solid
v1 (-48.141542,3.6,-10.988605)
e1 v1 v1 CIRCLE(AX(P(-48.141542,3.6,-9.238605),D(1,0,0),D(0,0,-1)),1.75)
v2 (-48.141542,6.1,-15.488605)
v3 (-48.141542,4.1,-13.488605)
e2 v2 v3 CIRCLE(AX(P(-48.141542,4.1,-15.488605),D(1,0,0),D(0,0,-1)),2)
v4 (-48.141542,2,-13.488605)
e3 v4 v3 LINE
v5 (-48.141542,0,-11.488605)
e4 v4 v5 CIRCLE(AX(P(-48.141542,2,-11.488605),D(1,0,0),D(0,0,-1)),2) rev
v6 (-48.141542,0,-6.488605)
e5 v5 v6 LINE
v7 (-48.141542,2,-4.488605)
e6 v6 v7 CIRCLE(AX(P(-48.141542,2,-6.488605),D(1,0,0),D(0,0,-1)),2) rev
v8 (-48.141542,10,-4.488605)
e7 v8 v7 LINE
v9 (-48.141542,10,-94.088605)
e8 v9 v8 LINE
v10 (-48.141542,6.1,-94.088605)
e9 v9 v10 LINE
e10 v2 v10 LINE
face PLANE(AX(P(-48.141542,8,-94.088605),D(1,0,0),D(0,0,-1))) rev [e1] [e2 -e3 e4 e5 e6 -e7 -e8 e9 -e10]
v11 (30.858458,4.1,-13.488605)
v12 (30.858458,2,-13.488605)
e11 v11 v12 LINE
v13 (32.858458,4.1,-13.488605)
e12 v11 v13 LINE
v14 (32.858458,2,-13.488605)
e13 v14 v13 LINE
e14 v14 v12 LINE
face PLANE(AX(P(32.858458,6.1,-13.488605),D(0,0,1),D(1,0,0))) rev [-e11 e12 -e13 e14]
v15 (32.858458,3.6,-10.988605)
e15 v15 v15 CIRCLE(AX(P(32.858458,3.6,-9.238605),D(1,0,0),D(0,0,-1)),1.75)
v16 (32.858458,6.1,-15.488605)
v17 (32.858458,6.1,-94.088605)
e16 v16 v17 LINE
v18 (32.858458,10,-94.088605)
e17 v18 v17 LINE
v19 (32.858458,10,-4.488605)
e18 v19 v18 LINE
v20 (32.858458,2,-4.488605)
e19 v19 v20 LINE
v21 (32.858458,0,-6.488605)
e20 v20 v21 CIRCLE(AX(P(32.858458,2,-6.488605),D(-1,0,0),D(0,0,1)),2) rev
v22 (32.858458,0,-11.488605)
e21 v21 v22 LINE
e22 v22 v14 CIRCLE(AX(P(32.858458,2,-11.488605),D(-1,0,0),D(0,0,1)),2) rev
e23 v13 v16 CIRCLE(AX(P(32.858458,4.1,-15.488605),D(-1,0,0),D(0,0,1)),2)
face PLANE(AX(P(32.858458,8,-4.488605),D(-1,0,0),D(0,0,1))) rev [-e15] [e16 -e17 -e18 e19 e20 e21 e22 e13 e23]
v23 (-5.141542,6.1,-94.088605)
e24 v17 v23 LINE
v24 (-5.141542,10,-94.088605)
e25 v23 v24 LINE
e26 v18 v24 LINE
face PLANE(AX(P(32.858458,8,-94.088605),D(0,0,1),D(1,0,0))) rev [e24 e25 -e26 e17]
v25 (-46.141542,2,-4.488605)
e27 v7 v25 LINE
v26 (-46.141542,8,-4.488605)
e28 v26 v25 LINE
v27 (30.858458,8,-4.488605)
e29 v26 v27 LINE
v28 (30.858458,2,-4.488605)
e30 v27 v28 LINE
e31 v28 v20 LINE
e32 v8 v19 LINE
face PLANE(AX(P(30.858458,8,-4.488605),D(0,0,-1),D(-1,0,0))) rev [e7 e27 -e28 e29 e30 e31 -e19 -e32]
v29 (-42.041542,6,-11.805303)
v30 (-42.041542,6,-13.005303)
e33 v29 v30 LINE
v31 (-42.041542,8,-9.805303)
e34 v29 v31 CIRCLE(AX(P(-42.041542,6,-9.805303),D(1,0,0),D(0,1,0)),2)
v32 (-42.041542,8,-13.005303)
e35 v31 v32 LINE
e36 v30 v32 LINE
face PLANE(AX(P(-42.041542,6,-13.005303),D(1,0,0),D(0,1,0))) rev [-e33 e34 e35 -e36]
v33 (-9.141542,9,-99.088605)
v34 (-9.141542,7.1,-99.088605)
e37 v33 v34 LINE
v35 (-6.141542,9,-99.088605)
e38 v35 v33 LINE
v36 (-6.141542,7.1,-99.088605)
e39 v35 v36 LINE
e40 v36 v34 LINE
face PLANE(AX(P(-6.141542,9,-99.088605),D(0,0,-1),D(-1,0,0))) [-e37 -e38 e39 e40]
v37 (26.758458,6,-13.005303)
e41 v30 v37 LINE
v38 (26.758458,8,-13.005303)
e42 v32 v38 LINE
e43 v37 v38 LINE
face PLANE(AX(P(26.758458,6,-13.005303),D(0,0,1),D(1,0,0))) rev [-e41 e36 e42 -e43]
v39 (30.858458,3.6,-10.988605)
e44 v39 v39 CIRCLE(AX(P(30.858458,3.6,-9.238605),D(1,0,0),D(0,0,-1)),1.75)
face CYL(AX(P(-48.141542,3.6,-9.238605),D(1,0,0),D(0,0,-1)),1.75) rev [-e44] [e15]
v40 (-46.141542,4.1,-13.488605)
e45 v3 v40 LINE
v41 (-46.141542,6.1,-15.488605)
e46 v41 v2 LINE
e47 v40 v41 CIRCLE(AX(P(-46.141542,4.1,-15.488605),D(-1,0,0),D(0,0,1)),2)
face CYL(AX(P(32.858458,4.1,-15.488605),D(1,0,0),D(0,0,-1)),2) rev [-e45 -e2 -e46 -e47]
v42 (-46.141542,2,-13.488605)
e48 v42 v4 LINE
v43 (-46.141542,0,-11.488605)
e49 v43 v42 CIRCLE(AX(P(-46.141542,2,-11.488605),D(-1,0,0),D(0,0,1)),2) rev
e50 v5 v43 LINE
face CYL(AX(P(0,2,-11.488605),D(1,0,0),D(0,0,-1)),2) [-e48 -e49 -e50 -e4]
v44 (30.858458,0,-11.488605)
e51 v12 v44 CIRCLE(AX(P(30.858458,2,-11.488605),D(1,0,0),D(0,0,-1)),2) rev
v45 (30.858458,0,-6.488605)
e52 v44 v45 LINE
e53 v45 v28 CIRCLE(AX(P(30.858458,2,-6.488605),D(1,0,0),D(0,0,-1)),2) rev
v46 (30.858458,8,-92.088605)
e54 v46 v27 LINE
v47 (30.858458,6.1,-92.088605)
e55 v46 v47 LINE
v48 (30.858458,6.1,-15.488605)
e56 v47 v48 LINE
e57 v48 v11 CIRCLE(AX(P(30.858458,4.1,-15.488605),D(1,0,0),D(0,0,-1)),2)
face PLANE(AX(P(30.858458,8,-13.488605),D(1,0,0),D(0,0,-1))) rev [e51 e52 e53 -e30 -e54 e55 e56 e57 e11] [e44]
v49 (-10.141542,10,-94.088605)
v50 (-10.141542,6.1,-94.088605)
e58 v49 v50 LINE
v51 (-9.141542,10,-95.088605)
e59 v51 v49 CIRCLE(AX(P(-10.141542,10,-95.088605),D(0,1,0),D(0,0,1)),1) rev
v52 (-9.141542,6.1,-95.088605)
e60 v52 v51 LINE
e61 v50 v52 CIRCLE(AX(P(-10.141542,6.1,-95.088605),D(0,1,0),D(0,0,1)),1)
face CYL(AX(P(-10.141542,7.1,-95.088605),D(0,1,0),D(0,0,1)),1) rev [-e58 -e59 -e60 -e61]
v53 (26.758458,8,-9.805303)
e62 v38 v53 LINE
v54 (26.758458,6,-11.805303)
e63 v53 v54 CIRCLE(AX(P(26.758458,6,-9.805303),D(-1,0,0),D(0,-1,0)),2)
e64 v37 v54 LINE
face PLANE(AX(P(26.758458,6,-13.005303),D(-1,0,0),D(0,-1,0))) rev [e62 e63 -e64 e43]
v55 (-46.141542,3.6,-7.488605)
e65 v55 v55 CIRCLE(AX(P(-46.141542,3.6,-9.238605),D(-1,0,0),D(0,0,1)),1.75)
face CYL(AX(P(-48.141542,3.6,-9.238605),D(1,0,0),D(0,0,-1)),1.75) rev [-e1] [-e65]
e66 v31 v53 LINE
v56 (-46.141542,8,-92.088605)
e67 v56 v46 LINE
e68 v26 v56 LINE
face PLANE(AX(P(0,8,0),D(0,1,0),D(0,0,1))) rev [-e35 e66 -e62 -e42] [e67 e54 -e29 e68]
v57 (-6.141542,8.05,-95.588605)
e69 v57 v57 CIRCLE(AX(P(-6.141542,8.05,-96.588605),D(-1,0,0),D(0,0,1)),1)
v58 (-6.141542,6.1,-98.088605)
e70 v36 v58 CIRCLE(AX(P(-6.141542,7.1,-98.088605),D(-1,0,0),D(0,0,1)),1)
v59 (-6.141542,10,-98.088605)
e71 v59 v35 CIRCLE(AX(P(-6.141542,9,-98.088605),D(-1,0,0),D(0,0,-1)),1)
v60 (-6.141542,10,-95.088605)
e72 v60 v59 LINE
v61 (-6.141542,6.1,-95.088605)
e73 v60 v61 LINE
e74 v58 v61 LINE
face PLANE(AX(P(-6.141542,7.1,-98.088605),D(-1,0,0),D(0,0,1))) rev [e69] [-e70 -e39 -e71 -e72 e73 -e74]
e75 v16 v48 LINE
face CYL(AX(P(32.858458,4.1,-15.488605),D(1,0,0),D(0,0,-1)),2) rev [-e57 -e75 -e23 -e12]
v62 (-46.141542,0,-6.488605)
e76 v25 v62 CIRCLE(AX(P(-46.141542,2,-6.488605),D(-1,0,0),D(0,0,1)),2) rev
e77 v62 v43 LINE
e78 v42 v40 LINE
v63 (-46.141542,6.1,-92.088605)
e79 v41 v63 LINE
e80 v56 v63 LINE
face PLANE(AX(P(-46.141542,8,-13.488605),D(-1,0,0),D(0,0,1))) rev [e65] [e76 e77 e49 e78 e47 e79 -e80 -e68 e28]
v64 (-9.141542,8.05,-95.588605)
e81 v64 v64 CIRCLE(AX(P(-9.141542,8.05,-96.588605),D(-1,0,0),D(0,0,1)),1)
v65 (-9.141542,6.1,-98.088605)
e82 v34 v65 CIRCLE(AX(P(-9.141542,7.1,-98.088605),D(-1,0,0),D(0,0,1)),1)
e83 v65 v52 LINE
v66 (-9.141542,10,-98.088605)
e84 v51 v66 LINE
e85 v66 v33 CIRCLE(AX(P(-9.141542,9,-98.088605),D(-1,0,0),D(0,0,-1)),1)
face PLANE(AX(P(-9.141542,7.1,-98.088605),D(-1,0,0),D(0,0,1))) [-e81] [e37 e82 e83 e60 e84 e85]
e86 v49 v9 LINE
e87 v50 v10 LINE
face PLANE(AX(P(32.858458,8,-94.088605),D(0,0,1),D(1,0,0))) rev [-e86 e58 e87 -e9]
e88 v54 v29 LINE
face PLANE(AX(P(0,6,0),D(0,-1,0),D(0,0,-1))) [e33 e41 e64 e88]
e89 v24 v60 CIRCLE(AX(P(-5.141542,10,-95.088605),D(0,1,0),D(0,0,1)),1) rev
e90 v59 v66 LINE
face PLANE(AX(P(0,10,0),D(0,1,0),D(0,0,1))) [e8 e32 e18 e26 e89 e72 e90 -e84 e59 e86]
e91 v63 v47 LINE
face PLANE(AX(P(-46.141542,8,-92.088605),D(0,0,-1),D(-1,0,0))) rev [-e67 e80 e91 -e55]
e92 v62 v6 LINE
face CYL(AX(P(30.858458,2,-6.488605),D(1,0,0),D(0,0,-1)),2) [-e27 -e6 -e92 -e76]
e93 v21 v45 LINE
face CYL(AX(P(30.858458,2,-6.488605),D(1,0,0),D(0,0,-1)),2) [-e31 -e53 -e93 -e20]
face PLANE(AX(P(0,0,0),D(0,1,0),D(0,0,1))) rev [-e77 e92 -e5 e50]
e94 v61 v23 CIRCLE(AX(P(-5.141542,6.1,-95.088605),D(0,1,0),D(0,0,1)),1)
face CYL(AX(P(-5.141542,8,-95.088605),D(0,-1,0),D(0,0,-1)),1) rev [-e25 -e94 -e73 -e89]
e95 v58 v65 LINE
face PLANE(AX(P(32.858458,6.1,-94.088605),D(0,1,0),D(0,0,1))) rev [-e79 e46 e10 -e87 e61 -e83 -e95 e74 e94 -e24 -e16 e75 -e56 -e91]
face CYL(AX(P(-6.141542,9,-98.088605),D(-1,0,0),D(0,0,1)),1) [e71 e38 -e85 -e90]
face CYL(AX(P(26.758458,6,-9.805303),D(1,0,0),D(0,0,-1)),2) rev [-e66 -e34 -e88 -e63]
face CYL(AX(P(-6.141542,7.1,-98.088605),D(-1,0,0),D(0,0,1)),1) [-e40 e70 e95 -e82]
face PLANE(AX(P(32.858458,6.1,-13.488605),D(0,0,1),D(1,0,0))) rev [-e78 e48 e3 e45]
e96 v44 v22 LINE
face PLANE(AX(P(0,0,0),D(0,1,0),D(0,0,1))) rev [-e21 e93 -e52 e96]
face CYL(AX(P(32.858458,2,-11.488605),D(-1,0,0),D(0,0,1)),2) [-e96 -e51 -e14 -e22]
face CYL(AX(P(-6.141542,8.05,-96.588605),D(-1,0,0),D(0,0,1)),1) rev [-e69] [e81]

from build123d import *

# Parameters (mm, degrees)
BOSS_EXTRUDE2_DEPTH      = 8
SKETCH2_W                = 81
SKETCH2_H                = 89.6
BOSS_EXTRUDE3_DEPTH      = 2
SKETCH3_R                = 1.75
CUT_EXTRUDE1_DEPTH       = 125.5538661
CUT_EXTRUDE2_DEPTH       = 124.262587838
CUT_EXTRUDE2_DEPTH_BACK  = 124.262587838
SKETCH4_W                = 80.6
SKETCH4_H                = 6.1
SKETCH5_W                = 68.8
SKETCH5_H                = 1.2
BOSS_EXTRUDE4_DEPTH      = 2
FILLET2_R                = 2
BOSS_EXTRUDE5_DEPTH      = 1.5
BOSS_EXTRUDE5_DEPTH_BACK = 1.5
SKETCH7_R                = 1
FILLET5_R                = 1


with BuildPart() as part:
    # Sketch1 → Boss-Extrude2 (new body)
    with BuildSketch(Plane(origin=(0, 0, 0), x_dir=(1, 0, 0), z_dir=(0, 1, 0))):
        Polygon((-46.14154214, 4.488604838), (-46.14154214, 13.488604838), (-46.14154214, 92.088604838), (30.85845786, 92.088604838), (30.85845786, 13.488604838), (30.85845786, 4.488604838), (32.85845786, 4.488604838), (32.85845786, 94.088604838), (-48.14154214, 94.088604838), (-48.14154214, 4.488604838), align=None)
    extrude(amount=BOSS_EXTRUDE2_DEPTH)

    # Sketch2 → Boss-Extrude3 (add)
    with BuildSketch(Plane(origin=(0, 8, 0), x_dir=(1, 0, 0), z_dir=(0, 1, 0))):
        with Locations((-7.64154214, 49.288604838)):
            Rectangle(SKETCH2_W, SKETCH2_H)
    extrude(amount=BOSS_EXTRUDE3_DEPTH)

    # Sketch3 → Cut-Extrude1 (cut, through all)
    with BuildSketch(Plane(origin=(32.85845786, 0, 0), x_dir=(0, 0, -1), z_dir=(1, 0, 0))):
        with Locations((9.238604838, 3.6)):
            Circle(SKETCH3_R)
    extrude(amount=-CUT_EXTRUDE1_DEPTH, mode=Mode.SUBTRACT)

    # Sketch4 → Cut-Extrude2 (cut, two sides: drawn at the far end of the back side and taken through both)
    with BuildSketch(Plane.ZY.offset(-30.85845786).offset(-CUT_EXTRUDE2_DEPTH_BACK)):
        with Locations((-53.788604838, 3.05)):
            Rectangle(SKETCH4_W, SKETCH4_H)
    extrude(amount=CUT_EXTRUDE2_DEPTH + CUT_EXTRUDE2_DEPTH_BACK, mode=Mode.SUBTRACT)

    # Sketch5 → Boss-Extrude4 (add)
    with BuildSketch(Plane.XZ.offset(-8)):
        with Locations((-7.64154214, -12.405302831)):
            Rectangle(SKETCH5_W, SKETCH5_H)
    extrude(amount=BOSS_EXTRUDE4_DEPTH)

    # Fillet2
    fillet2_edges = [part.edges().sort_by_distance(p)[0] for p in [
        (-7.64154214, 8, -11.805302831),
        (-47.14154214, 0, -4.488604838),
        (-47.14154214, 0, -13.488604838),
        (-47.14154214, 6.1, -13.488604838),
        (31.85845786, 6.1, -13.488604838),
        (31.85845786, 0, -4.488604838),
        (31.85845786, 0, -13.488604838),
    ]]
    fillet(fillet2_edges, radius=FILLET2_R - 0.0001)  # a hair under: the kernel refuses the full size

    # Sketch7 → Boss-Extrude5 (add, two sides: drawn at the far end of the back side and taken through both)
    with BuildSketch(Plane.ZY.offset(7.64154214).offset(-BOSS_EXTRUDE5_DEPTH_BACK)):
        with BuildLine():
            Line((-94.088604838, 10), (-98.088604838, 10))
            ThreePointArc((-98.088604838, 10), (-98.79571162, 9.707106781), (-99.088604838, 9))
            Line((-99.088604838, 9), (-99.088604838, 7.1))
            ThreePointArc((-99.088604838, 7.1), (-98.79571162, 6.392893219), (-98.088604838, 6.1))
            Line((-98.088604838, 6.1), (-94.088604838, 6.1))
            Line((-94.088604838, 6.1), (-94.088604838, 10))
        make_face()
        with Locations((-96.588604838, 8.05)):
            Circle(SKETCH7_R, mode=Mode.SUBTRACT)
    extrude(amount=BOSS_EXTRUDE5_DEPTH + BOSS_EXTRUDE5_DEPTH_BACK)

    # Fillet5
    fillet5_edges = [part.edges().sort_by_distance(p)[0] for p in [
        (-6.14154214, 8.05, -94.088604838),
        (-9.14154214, 8.05, -94.088604838),
    ]]
    fillet(fillet5_edges, radius=FILLET5_R)


solid = part.part
